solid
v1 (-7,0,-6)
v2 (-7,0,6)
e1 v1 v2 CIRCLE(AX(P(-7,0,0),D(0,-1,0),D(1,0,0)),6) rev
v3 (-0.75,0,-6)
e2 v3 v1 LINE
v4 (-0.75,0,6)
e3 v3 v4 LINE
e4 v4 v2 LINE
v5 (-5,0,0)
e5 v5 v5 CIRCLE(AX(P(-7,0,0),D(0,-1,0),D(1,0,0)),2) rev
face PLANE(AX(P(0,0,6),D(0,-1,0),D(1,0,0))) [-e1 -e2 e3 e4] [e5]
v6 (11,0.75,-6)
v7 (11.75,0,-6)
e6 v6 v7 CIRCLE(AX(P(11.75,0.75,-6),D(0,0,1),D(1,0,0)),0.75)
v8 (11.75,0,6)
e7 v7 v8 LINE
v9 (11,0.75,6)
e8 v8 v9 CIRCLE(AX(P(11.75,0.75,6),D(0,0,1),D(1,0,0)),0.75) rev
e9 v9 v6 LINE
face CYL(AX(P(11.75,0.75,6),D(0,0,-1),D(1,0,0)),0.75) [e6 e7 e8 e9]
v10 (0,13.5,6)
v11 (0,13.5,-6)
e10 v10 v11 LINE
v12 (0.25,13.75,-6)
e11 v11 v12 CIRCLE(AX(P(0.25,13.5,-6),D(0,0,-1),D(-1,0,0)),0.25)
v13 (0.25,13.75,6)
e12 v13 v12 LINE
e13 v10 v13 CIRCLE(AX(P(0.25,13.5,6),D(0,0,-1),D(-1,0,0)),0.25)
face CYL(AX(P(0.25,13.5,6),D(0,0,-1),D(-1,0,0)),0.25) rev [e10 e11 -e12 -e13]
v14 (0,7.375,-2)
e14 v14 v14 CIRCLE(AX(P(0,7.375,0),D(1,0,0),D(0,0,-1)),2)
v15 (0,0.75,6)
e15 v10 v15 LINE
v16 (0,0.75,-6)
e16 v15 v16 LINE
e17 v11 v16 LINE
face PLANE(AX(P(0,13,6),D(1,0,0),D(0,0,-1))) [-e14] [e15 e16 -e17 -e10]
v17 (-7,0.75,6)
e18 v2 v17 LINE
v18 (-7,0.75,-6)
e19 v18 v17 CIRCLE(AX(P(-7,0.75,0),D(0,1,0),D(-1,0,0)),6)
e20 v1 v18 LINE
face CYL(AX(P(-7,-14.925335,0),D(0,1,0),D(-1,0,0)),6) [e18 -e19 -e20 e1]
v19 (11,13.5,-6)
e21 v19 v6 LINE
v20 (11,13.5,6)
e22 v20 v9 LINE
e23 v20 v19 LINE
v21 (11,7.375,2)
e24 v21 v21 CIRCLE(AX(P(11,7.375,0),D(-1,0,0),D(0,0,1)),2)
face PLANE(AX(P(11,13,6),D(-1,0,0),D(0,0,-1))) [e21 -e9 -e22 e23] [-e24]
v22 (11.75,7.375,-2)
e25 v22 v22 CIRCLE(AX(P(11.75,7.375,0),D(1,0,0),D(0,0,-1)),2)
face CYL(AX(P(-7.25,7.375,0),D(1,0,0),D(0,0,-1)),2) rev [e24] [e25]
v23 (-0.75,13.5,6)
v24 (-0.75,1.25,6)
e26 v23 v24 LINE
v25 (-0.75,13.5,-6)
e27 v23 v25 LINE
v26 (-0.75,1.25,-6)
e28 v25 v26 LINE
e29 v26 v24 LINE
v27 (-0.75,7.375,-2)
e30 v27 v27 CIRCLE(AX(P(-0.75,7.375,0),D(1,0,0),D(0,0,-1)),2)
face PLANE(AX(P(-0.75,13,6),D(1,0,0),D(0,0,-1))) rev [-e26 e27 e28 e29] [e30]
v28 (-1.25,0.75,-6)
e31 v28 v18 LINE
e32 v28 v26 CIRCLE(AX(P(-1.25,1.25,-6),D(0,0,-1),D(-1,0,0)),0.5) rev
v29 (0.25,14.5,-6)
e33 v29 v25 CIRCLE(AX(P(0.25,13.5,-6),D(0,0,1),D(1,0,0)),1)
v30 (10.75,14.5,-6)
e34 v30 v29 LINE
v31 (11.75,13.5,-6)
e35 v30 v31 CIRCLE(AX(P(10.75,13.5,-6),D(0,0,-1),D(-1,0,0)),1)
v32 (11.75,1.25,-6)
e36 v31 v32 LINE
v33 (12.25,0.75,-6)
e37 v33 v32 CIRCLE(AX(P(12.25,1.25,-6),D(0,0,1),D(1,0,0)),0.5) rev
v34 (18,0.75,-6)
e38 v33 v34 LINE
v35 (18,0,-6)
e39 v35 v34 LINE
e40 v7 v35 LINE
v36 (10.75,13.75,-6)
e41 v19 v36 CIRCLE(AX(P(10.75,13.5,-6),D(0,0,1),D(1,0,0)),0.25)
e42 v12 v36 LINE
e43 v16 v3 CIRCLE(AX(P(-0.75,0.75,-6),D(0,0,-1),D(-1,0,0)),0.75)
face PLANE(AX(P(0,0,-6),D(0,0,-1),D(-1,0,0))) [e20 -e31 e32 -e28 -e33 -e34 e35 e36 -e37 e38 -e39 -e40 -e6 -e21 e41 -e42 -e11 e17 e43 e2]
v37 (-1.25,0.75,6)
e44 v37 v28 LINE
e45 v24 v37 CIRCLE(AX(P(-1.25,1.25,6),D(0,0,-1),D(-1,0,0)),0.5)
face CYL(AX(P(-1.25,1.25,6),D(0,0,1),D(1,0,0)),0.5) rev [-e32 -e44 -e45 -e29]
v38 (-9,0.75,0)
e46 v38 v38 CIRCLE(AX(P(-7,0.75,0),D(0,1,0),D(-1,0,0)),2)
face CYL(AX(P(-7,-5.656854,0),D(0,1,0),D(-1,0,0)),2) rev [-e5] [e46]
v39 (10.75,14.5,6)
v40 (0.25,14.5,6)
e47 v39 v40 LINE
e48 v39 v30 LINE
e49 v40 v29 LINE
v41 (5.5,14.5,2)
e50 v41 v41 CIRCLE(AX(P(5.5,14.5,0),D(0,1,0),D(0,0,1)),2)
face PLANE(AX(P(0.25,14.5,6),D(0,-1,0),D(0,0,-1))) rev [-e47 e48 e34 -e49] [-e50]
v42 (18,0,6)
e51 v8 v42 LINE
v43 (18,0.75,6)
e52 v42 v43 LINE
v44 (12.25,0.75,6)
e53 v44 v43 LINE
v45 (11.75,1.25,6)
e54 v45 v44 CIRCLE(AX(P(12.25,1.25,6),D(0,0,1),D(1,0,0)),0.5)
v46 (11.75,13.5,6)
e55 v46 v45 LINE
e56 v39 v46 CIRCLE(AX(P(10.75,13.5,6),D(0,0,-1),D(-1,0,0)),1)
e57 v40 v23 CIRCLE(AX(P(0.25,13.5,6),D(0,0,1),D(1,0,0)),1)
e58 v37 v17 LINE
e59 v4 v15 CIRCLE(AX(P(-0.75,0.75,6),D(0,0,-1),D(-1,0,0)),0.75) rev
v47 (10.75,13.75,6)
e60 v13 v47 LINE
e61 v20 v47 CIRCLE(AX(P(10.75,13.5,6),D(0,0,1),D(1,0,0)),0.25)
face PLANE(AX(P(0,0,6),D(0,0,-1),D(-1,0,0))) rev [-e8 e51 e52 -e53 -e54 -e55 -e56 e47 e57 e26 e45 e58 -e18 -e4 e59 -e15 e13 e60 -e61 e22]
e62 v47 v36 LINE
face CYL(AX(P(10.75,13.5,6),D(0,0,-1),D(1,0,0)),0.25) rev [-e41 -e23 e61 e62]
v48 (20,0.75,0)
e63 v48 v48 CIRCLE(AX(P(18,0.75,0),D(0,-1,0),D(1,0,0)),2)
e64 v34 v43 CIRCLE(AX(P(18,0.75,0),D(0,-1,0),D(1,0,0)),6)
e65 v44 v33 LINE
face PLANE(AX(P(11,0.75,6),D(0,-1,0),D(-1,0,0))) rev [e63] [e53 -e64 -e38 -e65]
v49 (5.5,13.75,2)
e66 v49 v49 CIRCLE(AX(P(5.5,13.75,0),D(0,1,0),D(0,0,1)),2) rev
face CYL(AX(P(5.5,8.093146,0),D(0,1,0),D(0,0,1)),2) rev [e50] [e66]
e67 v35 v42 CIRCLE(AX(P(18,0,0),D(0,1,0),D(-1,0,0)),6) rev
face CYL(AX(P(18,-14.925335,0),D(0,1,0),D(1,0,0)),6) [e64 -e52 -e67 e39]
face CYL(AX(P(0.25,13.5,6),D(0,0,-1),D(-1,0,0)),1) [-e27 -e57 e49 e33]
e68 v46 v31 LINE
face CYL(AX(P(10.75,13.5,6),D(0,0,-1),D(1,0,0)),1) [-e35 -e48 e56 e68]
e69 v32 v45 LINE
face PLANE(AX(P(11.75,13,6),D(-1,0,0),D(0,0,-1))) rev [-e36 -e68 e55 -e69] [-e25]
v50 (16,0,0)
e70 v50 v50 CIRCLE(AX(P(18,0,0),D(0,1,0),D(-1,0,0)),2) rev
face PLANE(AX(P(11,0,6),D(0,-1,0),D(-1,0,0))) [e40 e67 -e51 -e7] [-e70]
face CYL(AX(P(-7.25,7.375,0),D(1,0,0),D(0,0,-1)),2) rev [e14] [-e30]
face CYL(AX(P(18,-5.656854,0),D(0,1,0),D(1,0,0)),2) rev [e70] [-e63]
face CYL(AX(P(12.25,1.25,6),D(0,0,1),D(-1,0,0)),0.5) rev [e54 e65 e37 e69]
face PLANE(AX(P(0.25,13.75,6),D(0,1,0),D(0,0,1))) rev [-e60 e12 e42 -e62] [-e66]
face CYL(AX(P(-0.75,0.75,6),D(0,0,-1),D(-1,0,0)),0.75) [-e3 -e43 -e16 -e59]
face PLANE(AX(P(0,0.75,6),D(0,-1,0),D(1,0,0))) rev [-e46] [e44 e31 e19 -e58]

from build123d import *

# Parameters (mm, degrees)
ESTRUSIONE_SOTTILE1_DEPTH    = 6
RACCORDO3_R                  = 6
SCHIZZO4_R                   = 2
TAGLIO_ESTRUSIONE1_DEPTH     = 0.75
RACCORDO1_R                  = 0.75
RACCORDO2_R                  = 0.5
TAGLIO_ESTRUSIONE2_DEPTH     = 0.75
SCHIZZO6_R                   = 2
ESTRUSIONE_ESTRUSIONE1_DEPTH = 0.75
ESTRUSIONE_ESTRUSIONE3_DEPTH = 6
RACCORDO3_OF_SPECCHIA2_R     = 6
RACCORDO1_OF_SPECCHIA2_R     = 0.75
RACCORDO2_OF_SPECCHIA2_R     = 0.5
SCHIZZO8_R                   = 2
TAGLIO_ESTRUSIONE3_DEPTH     = 0.75
SCHIZZO9_R                   = 2
TAGLIO_ESTRUSIONE4_DEPTH     = 19


with BuildPart() as part:
    # Schizzo1 → Estrusione-Sottile1 (new, symmetric)
    with BuildSketch(Plane.XY):
        Polygon((0, 13), (0, 0), (-11, 0), (-11, 0.75), (-0.75, 0.75), (-0.75, 13), align=None)
    estrusione_sottile1 = extrude(amount=ESTRUSIONE_SOTTILE1_DEPTH, both=True)

    # Raccordo3
    raccordo3_edges = [part.edges().sort_by_distance(p)[0] for p in [
        (-11, 0.375, 6),
        (-11, 0.375, -6),
        (-0.375, 13, -6),
        (-0.375, 13, 6),
    ]]
    fillet(raccordo3_edges, radius=RACCORDO3_R - 0.0001)  # a hair under: the kernel refuses the full size

    # Schizzo4 → Taglio-Estrusione1 (cut)
    with BuildSketch(Plane(origin=(0, 0.75, 0), x_dir=(1, 0, 0), z_dir=(0, 1, 0))):
        with Locations(Location((-7, 0, 0), (0, 0, 180))):
            Circle(SCHIZZO4_R)
    taglio_estrusione1 = extrude(amount=-TAGLIO_ESTRUSIONE1_DEPTH, mode=Mode.SUBTRACT)

    # Raccordo1
    raccordo1_edges = [part.edges().sort_by_distance(p)[0] for p in [
        (0, 0, 0),
    ]]
    fillet(raccordo1_edges, radius=RACCORDO1_R)

    # Raccordo2
    raccordo2_edges = [part.edges().sort_by_distance(p)[0] for p in [
        (-0.75, 0.75, 0),
    ]]
    fillet(raccordo2_edges, radius=RACCORDO2_R)

    # Schizzo5 → Taglio-Estrusione2 (cut)
    with BuildSketch(Plane.ZY.offset(0.75)):
        with BuildLine():
            Line((2, 9), (2, 3.5))
            ThreePointArc((2, 3.5), (0, 1.5), (-2, 3.5))
            Line((-2, 3.5), (-2, 9))
            ThreePointArc((-2, 9), (0, 11), (2, 9))
        make_face()
    extrude(amount=-TAGLIO_ESTRUSIONE2_DEPTH, mode=Mode.SUBTRACT)

    # Schizzo6 → Estrusione-Estrusione1 (add)
    with BuildSketch(Plane(origin=(0, 0.75, 0), x_dir=(1, 0, 0), z_dir=(0, 1, 0))):
        with BuildLine():
            Line((-4.125, -6), (-7, -6))
            ThreePointArc((-7, -6), (-13, 0), (-7, 6))
            Line((-7, 6), (-4.125, 6))
            Line((-4.125, 6), (-4.125, -6))
        make_face()
        with Locations(Location((-7, 0, 0), (0, 0, 180))):
            Circle(SCHIZZO6_R, mode=Mode.SUBTRACT)
    estrusione_estrusione1 = extrude(amount=-ESTRUSIONE_ESTRUSIONE1_DEPTH)

    # Schizzo7 → Estrusione-Estrusione3 (add, symmetric)
    with BuildSketch(Plane.XY):
        with BuildLine():
            Line((-0.75, 13), (-0.75, 7))
            Line((-0.75, 7), (-0.75, 1.25))
            ThreePointArc((-0.75, 1.25), (-0.896446609, 0.896446609), (-1.25, 0.75))
            Line((-1.25, 0.75), (-4.125, 0.75))
            Line((-4.125, 0.75), (-4.125, 0))
            Line((-4.125, 0), (-0.75, 0))
            ThreePointArc((-0.75, 0), (-0.219669914, 0.219669914), (0, 0.75))
            Line((0, 0.75), (0, 7))
            Line((0, 7), (0, 13))
            Line((0, 13), (0, 13.5))
            ThreePointArc((0, 13.5), (0.073223305, 13.676776695), (0.25, 13.75))
            Line((0.25, 13.75), (5.5, 13.75))
            Line((5.5, 13.75), (5.5, 14.5))
            Line((5.5, 14.5), (0.25, 14.5))
            ThreePointArc((0.25, 14.5), (-0.457106781, 14.207106781), (-0.75, 13.5))
            Line((-0.75, 13.5), (-0.75, 13))
        make_face()
    estrusione_estrusione3 = extrude(amount=ESTRUSIONE_ESTRUSIONE3_DEPTH, both=True)


with BuildPart() as specchia2_1:
    # Specchia2: Estrusione-Sottile1 across plane
    add(estrusione_sottile1.mirror(Plane(origin=(5.5, 14.5, 6), x_dir=(0, 0, 1), z_dir=(-1, 0, 0))))

    # Specchia2 2: Taglio-Estrusione1 across plane
    add(taglio_estrusione1.mirror(Plane(origin=(5.5, 14.5, 6), x_dir=(0, 0, 1), z_dir=(-1, 0, 0))), mode=Mode.SUBTRACT)

    # Raccordo3 of Specchia2
    raccordo3_of_specchia2_edges = [specchia2_1.edges().sort_by_distance(p)[0] for p in [
        (22, 0.375, 6),
        (22, 0.375, -6),
        (11.375, 13, -6),
        (11.375, 13, 6),
    ]]
    fillet(raccordo3_of_specchia2_edges, radius=RACCORDO3_OF_SPECCHIA2_R - 0.0001)  # a hair under: the kernel refuses the full size

    # Raccordo1 of Specchia2
    raccordo1_of_specchia2_edges = [specchia2_1.edges().sort_by_distance(p)[0] for p in [
        (11, 0, 0),
    ]]
    fillet(raccordo1_of_specchia2_edges, radius=RACCORDO1_OF_SPECCHIA2_R)

    # Raccordo2 of Specchia2
    raccordo2_of_specchia2_edges = [specchia2_1.edges().sort_by_distance(p)[0] for p in [
        (11.75, 0.75, 0),
    ]]
    fillet(raccordo2_of_specchia2_edges, radius=RACCORDO2_OF_SPECCHIA2_R)


with BuildPart() as specchia2_3_1:
    # Specchia2 3: Estrusione-Estrusione1, Estrusione-Estrusione3 across plane
    add(estrusione_estrusione1.mirror(Plane(origin=(5.5, 14.5, 6), x_dir=(0, 0, 1), z_dir=(-1, 0, 0))))
    add(estrusione_estrusione3.mirror(Plane(origin=(5.5, 14.5, 6), x_dir=(0, 0, 1), z_dir=(-1, 0, 0))))


with BuildPart() as part_1:
    add(part.part)

    # Specchia2 united with what the copies to: union Specchia2_1, Specchia2 3_1
    add(specchia2_1.part)
    add(specchia2_3_1.part)

    # Schizzo8 → Taglio-Estrusione3 (cut)
    with BuildSketch(Plane(origin=(0, 14.5, 0), x_dir=(1, 0, 0), z_dir=(0, 1, 0))):
        with Locations(Location((5.5, 0, 0), (0, 0, 270))):
            Circle(SCHIZZO8_R)
    extrude(amount=-TAGLIO_ESTRUSIONE3_DEPTH, mode=Mode.SUBTRACT)

    # Schizzo9 → Taglio-Estrusione4 (cut)
    with BuildSketch(Plane(origin=(11.75, 0, 0), x_dir=(0, 0, -1), z_dir=(1, 0, 0))):
        with Locations((0, 7.375)):
            Circle(SCHIZZO9_R)
    extrude(amount=-TAGLIO_ESTRUSIONE4_DEPTH, mode=Mode.SUBTRACT)


solid = part_1.part
